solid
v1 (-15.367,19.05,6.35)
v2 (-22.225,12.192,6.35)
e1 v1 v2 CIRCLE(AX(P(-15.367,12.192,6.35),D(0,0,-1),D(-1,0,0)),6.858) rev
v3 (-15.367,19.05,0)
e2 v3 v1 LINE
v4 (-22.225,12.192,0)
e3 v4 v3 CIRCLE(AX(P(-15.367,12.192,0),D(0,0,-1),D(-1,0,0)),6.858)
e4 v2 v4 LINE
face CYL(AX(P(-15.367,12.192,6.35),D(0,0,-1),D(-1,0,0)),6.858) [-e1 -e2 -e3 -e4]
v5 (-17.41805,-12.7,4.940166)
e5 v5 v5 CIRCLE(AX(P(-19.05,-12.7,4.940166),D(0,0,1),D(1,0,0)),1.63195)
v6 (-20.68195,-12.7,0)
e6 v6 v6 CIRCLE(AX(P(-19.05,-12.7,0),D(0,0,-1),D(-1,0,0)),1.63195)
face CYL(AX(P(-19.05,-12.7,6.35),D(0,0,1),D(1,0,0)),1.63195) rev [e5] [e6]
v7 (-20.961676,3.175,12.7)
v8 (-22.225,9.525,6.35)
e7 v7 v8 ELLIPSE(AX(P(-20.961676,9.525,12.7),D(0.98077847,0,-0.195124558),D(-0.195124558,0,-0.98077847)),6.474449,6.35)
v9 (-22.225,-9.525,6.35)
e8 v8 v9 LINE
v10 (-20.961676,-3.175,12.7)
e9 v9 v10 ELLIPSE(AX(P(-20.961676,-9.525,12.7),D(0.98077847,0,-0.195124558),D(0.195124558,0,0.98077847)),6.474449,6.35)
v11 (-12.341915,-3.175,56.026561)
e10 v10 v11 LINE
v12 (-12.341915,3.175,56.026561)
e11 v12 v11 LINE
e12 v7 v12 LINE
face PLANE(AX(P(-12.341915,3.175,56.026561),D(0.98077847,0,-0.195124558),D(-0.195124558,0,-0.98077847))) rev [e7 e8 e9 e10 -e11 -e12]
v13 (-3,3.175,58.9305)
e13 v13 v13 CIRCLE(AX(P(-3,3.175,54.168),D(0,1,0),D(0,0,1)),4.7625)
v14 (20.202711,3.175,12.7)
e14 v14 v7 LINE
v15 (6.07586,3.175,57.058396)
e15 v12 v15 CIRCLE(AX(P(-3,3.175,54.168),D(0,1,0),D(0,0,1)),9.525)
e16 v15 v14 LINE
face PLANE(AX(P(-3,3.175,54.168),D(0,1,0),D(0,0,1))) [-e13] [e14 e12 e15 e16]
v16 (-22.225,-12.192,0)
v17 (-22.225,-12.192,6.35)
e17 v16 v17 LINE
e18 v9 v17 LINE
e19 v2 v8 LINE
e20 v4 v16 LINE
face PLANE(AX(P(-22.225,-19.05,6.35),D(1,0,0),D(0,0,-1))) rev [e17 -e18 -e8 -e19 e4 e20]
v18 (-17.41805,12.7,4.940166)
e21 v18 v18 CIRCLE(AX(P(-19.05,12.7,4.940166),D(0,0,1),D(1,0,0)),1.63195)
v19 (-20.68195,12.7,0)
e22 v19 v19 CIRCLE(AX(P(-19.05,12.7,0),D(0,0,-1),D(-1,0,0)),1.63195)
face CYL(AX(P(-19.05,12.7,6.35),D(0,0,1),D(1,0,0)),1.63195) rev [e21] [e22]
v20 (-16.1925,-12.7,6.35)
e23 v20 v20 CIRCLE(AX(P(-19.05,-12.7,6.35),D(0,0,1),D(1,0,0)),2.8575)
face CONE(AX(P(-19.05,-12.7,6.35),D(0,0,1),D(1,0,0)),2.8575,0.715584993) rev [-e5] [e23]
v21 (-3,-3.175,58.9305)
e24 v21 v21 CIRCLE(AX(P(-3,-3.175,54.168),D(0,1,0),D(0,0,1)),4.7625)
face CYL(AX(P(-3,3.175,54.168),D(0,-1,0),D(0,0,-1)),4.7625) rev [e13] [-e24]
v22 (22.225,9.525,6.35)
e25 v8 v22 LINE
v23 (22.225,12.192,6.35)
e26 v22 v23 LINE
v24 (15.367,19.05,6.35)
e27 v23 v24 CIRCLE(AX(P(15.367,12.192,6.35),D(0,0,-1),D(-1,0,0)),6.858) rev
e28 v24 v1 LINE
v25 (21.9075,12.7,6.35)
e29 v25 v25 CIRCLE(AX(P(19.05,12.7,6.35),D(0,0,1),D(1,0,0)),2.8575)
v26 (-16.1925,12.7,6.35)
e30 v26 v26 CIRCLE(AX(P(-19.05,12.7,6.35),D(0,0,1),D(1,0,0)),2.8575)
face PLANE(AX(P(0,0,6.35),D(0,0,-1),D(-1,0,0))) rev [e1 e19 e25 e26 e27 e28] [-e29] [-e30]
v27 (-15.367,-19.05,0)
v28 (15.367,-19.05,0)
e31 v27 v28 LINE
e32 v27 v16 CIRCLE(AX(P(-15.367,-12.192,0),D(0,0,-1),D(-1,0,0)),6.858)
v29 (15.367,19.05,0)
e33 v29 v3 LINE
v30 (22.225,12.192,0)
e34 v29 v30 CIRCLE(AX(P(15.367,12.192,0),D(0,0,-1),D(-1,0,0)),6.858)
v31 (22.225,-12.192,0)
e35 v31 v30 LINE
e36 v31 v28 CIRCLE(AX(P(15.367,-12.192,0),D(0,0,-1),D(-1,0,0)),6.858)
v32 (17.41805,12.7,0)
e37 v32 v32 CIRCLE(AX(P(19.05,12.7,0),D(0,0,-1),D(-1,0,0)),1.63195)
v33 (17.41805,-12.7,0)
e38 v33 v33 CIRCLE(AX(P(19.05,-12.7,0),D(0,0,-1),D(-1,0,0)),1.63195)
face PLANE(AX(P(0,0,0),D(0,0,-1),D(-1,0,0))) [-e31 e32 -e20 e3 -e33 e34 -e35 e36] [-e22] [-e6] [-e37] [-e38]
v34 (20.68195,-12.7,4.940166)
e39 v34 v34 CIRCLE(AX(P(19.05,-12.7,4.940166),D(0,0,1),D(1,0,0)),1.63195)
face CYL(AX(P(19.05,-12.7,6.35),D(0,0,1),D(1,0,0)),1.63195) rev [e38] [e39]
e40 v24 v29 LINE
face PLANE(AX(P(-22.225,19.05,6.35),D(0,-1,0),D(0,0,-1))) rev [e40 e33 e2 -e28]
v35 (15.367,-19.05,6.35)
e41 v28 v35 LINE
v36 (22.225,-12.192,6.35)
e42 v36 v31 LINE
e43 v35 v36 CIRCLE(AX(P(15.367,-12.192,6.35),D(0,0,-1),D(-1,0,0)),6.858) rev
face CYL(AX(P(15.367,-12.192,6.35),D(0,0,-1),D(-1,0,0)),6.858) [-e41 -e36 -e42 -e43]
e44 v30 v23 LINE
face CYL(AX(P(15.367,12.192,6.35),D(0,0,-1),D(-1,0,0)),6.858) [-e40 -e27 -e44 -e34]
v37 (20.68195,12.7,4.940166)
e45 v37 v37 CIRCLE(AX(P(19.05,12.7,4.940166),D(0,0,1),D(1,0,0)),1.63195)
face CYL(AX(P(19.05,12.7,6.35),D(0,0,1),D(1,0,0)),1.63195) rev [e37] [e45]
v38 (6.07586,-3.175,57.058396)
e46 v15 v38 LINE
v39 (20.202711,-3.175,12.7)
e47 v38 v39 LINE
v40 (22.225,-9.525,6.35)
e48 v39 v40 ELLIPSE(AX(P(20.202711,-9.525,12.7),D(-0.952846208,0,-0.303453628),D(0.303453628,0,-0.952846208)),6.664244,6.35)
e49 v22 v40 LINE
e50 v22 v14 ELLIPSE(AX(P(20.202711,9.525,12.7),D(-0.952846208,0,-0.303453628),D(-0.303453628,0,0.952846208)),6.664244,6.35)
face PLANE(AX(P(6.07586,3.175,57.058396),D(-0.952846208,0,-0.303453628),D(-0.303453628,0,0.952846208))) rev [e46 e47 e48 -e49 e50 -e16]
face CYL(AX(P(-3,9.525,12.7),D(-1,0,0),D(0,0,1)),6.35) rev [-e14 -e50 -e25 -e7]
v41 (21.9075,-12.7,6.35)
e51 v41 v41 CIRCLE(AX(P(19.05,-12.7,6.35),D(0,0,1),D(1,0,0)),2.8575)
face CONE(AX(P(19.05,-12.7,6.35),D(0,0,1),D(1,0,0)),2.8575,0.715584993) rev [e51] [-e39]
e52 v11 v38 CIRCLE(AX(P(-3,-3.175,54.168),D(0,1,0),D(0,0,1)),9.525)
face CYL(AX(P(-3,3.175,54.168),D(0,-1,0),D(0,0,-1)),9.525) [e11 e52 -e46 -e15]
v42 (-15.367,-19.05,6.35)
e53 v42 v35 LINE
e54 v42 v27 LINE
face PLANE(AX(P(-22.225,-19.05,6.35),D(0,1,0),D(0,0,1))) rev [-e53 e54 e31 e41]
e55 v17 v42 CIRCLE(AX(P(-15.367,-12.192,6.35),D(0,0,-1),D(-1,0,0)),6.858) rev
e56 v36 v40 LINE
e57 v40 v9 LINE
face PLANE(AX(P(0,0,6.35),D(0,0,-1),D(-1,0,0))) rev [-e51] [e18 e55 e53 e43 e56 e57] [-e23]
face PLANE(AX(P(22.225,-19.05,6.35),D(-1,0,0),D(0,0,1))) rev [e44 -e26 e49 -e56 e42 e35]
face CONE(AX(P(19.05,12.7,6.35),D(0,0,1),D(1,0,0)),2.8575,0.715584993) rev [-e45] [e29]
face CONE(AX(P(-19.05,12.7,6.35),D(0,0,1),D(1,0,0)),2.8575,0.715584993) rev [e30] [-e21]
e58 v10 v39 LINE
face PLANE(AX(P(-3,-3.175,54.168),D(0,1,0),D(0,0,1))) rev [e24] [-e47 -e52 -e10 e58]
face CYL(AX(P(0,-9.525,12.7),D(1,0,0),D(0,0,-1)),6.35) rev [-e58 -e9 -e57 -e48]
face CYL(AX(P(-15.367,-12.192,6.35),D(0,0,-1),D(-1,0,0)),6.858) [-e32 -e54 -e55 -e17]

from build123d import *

# Parameters (mm, degrees)
SKETCH1_W                                      = 44.45
SKETCH1_H                                      = 38.1
BOSS_EXTRUDE1_DEPTH                            = 6.35
CSK_FOR_4_FLAT_HEAD_MACHINE_SCREW1_D           = 3.2639
CSK_FOR_4_FLAT_HEAD_MACHINE_SCREW1_CSINK_D     = 5.715
CSK_FOR_4_FLAT_HEAD_MACHINE_SCREW1_CSINK_ANGLE = 82
SKETCH4_R                                      = 4.7625
BOSS_EXTRUDE2_DEPTH                            = 3.175
FILLET2_R                                      = 6.858
FILLET3_R                                      = 6.35


with BuildPart() as part:
    # Sketch1 → Boss-Extrude1 (new body)
    with BuildSketch(Plane.XY):
        Rectangle(SKETCH1_W, SKETCH1_H)
    extrude(amount=BOSS_EXTRUDE1_DEPTH)

    # CSK for #4 Flat Head Machine Screw1 (through all)
    with Locations(Plane.XY.offset(6.35)):
        with Locations((-19.05, 12.7), (19.05, -12.7), (-19.05, -12.7), (19.05, 12.7)):
            CounterSinkHole(CSK_FOR_4_FLAT_HEAD_MACHINE_SCREW1_D / 2, CSK_FOR_4_FLAT_HEAD_MACHINE_SCREW1_CSINK_D / 2, counter_sink_angle=CSK_FOR_4_FLAT_HEAD_MACHINE_SCREW1_CSINK_ANGLE)

    # Sketch4 → Boss-Extrude2 (add, symmetric)
    with BuildSketch(Plane(origin=(0, 0, 0), x_dir=(1, 0, 0), z_dir=(0, 1, 0))):
        with BuildLine():
            Line((-12.341914895, -56.026561414), (-22.225, -6.35))
            Line((-22.225, -6.35), (22.225, -6.35))
            Line((22.225, -6.35), (6.07586016, -57.058395803))
            ThreePointArc((6.07586016, -57.058395803), (-3.532791524, -63.678087179), (-12.341914895, -56.026561414))
        make_face()
        with Locations(Location((-2.99999997, -54.168, 0), (0, 0, 270))):
            Circle(SKETCH4_R, mode=Mode.SUBTRACT)
    extrude(amount=BOSS_EXTRUDE2_DEPTH, both=True)

    # Fillet2
    fillet2_edges = [part.edges().sort_by_distance(p)[0] for p in [
        (22.225, -19.05, 3.175),
        (-22.225, -19.05, 3.175),
        (-22.225, 19.05, 3.175),
        (22.225, 19.05, 3.175),
    ]]
    fillet(fillet2_edges, radius=FILLET2_R)

    # Fillet3
    # the kernel refuses this fillet: 6.35 mm, written as the material it adds along each edge
    with BuildSketch(Plane(origin=(-22.225, 3.175, 6.35), x_dir=(0, 1, 0), z_dir=(1, 0, 0))) as fillet3_piece_1_section:
        with BuildLine():
            CenterArc((FILLET3_R, FILLET3_R), FILLET3_R, 180, 90)
            Line((0, FILLET3_R), (0, 0))
            Line((0, 0), (FILLET3_R, 0))
        make_face()
    fillet3_piece_1 = extrude(amount=44.45, mode=Mode.PRIVATE)
    fillet3_piece_1 = split(fillet3_piece_1, bisect_by=Plane(origin=(-21.111154549, 4.625615872, 11.948657846), z_dir=(0.980778469831864, 0, -0.19512455794765435)), keep=Keep.TOP, mode=Mode.PRIVATE)
    fillet3_piece_1 = split(fillet3_piece_1, bisect_by=Plane(origin=(19.761324723, 4.625615872, 14.085955123), z_dir=(-0.9528462078877957, 0, -0.30345362761688605)), keep=Keep.TOP, mode=Mode.PRIVATE)
    add(fillet3_piece_1)
    with BuildSketch(Plane(origin=(-22.225, -3.175, 6.35), x_dir=(0, -1, 0), z_dir=(1, 0, 0))) as fillet3_piece_2_section:
        with BuildLine():
            CenterArc((FILLET3_R, -FILLET3_R), FILLET3_R, 90, 90)
            Line((0, -FILLET3_R), (0, 0))
            Line((0, 0), (FILLET3_R, 0))
        make_face()
    fillet3_piece_2 = extrude(amount=44.45, mode=Mode.PRIVATE)
    fillet3_piece_2 = split(fillet3_piece_2, bisect_by=Plane(origin=(-21.111154549, -4.625615872, 11.948657846), z_dir=(0.980778469831864, 0, -0.19512455794765435)), keep=Keep.TOP, mode=Mode.PRIVATE)
    fillet3_piece_2 = split(fillet3_piece_2, bisect_by=Plane(origin=(19.761324723, -4.625615872, 14.085955123), z_dir=(-0.9528462078877957, 0, -0.30345362761688605)), keep=Keep.TOP, mode=Mode.PRIVATE)
    add(fillet3_piece_2)


solid = part.part
